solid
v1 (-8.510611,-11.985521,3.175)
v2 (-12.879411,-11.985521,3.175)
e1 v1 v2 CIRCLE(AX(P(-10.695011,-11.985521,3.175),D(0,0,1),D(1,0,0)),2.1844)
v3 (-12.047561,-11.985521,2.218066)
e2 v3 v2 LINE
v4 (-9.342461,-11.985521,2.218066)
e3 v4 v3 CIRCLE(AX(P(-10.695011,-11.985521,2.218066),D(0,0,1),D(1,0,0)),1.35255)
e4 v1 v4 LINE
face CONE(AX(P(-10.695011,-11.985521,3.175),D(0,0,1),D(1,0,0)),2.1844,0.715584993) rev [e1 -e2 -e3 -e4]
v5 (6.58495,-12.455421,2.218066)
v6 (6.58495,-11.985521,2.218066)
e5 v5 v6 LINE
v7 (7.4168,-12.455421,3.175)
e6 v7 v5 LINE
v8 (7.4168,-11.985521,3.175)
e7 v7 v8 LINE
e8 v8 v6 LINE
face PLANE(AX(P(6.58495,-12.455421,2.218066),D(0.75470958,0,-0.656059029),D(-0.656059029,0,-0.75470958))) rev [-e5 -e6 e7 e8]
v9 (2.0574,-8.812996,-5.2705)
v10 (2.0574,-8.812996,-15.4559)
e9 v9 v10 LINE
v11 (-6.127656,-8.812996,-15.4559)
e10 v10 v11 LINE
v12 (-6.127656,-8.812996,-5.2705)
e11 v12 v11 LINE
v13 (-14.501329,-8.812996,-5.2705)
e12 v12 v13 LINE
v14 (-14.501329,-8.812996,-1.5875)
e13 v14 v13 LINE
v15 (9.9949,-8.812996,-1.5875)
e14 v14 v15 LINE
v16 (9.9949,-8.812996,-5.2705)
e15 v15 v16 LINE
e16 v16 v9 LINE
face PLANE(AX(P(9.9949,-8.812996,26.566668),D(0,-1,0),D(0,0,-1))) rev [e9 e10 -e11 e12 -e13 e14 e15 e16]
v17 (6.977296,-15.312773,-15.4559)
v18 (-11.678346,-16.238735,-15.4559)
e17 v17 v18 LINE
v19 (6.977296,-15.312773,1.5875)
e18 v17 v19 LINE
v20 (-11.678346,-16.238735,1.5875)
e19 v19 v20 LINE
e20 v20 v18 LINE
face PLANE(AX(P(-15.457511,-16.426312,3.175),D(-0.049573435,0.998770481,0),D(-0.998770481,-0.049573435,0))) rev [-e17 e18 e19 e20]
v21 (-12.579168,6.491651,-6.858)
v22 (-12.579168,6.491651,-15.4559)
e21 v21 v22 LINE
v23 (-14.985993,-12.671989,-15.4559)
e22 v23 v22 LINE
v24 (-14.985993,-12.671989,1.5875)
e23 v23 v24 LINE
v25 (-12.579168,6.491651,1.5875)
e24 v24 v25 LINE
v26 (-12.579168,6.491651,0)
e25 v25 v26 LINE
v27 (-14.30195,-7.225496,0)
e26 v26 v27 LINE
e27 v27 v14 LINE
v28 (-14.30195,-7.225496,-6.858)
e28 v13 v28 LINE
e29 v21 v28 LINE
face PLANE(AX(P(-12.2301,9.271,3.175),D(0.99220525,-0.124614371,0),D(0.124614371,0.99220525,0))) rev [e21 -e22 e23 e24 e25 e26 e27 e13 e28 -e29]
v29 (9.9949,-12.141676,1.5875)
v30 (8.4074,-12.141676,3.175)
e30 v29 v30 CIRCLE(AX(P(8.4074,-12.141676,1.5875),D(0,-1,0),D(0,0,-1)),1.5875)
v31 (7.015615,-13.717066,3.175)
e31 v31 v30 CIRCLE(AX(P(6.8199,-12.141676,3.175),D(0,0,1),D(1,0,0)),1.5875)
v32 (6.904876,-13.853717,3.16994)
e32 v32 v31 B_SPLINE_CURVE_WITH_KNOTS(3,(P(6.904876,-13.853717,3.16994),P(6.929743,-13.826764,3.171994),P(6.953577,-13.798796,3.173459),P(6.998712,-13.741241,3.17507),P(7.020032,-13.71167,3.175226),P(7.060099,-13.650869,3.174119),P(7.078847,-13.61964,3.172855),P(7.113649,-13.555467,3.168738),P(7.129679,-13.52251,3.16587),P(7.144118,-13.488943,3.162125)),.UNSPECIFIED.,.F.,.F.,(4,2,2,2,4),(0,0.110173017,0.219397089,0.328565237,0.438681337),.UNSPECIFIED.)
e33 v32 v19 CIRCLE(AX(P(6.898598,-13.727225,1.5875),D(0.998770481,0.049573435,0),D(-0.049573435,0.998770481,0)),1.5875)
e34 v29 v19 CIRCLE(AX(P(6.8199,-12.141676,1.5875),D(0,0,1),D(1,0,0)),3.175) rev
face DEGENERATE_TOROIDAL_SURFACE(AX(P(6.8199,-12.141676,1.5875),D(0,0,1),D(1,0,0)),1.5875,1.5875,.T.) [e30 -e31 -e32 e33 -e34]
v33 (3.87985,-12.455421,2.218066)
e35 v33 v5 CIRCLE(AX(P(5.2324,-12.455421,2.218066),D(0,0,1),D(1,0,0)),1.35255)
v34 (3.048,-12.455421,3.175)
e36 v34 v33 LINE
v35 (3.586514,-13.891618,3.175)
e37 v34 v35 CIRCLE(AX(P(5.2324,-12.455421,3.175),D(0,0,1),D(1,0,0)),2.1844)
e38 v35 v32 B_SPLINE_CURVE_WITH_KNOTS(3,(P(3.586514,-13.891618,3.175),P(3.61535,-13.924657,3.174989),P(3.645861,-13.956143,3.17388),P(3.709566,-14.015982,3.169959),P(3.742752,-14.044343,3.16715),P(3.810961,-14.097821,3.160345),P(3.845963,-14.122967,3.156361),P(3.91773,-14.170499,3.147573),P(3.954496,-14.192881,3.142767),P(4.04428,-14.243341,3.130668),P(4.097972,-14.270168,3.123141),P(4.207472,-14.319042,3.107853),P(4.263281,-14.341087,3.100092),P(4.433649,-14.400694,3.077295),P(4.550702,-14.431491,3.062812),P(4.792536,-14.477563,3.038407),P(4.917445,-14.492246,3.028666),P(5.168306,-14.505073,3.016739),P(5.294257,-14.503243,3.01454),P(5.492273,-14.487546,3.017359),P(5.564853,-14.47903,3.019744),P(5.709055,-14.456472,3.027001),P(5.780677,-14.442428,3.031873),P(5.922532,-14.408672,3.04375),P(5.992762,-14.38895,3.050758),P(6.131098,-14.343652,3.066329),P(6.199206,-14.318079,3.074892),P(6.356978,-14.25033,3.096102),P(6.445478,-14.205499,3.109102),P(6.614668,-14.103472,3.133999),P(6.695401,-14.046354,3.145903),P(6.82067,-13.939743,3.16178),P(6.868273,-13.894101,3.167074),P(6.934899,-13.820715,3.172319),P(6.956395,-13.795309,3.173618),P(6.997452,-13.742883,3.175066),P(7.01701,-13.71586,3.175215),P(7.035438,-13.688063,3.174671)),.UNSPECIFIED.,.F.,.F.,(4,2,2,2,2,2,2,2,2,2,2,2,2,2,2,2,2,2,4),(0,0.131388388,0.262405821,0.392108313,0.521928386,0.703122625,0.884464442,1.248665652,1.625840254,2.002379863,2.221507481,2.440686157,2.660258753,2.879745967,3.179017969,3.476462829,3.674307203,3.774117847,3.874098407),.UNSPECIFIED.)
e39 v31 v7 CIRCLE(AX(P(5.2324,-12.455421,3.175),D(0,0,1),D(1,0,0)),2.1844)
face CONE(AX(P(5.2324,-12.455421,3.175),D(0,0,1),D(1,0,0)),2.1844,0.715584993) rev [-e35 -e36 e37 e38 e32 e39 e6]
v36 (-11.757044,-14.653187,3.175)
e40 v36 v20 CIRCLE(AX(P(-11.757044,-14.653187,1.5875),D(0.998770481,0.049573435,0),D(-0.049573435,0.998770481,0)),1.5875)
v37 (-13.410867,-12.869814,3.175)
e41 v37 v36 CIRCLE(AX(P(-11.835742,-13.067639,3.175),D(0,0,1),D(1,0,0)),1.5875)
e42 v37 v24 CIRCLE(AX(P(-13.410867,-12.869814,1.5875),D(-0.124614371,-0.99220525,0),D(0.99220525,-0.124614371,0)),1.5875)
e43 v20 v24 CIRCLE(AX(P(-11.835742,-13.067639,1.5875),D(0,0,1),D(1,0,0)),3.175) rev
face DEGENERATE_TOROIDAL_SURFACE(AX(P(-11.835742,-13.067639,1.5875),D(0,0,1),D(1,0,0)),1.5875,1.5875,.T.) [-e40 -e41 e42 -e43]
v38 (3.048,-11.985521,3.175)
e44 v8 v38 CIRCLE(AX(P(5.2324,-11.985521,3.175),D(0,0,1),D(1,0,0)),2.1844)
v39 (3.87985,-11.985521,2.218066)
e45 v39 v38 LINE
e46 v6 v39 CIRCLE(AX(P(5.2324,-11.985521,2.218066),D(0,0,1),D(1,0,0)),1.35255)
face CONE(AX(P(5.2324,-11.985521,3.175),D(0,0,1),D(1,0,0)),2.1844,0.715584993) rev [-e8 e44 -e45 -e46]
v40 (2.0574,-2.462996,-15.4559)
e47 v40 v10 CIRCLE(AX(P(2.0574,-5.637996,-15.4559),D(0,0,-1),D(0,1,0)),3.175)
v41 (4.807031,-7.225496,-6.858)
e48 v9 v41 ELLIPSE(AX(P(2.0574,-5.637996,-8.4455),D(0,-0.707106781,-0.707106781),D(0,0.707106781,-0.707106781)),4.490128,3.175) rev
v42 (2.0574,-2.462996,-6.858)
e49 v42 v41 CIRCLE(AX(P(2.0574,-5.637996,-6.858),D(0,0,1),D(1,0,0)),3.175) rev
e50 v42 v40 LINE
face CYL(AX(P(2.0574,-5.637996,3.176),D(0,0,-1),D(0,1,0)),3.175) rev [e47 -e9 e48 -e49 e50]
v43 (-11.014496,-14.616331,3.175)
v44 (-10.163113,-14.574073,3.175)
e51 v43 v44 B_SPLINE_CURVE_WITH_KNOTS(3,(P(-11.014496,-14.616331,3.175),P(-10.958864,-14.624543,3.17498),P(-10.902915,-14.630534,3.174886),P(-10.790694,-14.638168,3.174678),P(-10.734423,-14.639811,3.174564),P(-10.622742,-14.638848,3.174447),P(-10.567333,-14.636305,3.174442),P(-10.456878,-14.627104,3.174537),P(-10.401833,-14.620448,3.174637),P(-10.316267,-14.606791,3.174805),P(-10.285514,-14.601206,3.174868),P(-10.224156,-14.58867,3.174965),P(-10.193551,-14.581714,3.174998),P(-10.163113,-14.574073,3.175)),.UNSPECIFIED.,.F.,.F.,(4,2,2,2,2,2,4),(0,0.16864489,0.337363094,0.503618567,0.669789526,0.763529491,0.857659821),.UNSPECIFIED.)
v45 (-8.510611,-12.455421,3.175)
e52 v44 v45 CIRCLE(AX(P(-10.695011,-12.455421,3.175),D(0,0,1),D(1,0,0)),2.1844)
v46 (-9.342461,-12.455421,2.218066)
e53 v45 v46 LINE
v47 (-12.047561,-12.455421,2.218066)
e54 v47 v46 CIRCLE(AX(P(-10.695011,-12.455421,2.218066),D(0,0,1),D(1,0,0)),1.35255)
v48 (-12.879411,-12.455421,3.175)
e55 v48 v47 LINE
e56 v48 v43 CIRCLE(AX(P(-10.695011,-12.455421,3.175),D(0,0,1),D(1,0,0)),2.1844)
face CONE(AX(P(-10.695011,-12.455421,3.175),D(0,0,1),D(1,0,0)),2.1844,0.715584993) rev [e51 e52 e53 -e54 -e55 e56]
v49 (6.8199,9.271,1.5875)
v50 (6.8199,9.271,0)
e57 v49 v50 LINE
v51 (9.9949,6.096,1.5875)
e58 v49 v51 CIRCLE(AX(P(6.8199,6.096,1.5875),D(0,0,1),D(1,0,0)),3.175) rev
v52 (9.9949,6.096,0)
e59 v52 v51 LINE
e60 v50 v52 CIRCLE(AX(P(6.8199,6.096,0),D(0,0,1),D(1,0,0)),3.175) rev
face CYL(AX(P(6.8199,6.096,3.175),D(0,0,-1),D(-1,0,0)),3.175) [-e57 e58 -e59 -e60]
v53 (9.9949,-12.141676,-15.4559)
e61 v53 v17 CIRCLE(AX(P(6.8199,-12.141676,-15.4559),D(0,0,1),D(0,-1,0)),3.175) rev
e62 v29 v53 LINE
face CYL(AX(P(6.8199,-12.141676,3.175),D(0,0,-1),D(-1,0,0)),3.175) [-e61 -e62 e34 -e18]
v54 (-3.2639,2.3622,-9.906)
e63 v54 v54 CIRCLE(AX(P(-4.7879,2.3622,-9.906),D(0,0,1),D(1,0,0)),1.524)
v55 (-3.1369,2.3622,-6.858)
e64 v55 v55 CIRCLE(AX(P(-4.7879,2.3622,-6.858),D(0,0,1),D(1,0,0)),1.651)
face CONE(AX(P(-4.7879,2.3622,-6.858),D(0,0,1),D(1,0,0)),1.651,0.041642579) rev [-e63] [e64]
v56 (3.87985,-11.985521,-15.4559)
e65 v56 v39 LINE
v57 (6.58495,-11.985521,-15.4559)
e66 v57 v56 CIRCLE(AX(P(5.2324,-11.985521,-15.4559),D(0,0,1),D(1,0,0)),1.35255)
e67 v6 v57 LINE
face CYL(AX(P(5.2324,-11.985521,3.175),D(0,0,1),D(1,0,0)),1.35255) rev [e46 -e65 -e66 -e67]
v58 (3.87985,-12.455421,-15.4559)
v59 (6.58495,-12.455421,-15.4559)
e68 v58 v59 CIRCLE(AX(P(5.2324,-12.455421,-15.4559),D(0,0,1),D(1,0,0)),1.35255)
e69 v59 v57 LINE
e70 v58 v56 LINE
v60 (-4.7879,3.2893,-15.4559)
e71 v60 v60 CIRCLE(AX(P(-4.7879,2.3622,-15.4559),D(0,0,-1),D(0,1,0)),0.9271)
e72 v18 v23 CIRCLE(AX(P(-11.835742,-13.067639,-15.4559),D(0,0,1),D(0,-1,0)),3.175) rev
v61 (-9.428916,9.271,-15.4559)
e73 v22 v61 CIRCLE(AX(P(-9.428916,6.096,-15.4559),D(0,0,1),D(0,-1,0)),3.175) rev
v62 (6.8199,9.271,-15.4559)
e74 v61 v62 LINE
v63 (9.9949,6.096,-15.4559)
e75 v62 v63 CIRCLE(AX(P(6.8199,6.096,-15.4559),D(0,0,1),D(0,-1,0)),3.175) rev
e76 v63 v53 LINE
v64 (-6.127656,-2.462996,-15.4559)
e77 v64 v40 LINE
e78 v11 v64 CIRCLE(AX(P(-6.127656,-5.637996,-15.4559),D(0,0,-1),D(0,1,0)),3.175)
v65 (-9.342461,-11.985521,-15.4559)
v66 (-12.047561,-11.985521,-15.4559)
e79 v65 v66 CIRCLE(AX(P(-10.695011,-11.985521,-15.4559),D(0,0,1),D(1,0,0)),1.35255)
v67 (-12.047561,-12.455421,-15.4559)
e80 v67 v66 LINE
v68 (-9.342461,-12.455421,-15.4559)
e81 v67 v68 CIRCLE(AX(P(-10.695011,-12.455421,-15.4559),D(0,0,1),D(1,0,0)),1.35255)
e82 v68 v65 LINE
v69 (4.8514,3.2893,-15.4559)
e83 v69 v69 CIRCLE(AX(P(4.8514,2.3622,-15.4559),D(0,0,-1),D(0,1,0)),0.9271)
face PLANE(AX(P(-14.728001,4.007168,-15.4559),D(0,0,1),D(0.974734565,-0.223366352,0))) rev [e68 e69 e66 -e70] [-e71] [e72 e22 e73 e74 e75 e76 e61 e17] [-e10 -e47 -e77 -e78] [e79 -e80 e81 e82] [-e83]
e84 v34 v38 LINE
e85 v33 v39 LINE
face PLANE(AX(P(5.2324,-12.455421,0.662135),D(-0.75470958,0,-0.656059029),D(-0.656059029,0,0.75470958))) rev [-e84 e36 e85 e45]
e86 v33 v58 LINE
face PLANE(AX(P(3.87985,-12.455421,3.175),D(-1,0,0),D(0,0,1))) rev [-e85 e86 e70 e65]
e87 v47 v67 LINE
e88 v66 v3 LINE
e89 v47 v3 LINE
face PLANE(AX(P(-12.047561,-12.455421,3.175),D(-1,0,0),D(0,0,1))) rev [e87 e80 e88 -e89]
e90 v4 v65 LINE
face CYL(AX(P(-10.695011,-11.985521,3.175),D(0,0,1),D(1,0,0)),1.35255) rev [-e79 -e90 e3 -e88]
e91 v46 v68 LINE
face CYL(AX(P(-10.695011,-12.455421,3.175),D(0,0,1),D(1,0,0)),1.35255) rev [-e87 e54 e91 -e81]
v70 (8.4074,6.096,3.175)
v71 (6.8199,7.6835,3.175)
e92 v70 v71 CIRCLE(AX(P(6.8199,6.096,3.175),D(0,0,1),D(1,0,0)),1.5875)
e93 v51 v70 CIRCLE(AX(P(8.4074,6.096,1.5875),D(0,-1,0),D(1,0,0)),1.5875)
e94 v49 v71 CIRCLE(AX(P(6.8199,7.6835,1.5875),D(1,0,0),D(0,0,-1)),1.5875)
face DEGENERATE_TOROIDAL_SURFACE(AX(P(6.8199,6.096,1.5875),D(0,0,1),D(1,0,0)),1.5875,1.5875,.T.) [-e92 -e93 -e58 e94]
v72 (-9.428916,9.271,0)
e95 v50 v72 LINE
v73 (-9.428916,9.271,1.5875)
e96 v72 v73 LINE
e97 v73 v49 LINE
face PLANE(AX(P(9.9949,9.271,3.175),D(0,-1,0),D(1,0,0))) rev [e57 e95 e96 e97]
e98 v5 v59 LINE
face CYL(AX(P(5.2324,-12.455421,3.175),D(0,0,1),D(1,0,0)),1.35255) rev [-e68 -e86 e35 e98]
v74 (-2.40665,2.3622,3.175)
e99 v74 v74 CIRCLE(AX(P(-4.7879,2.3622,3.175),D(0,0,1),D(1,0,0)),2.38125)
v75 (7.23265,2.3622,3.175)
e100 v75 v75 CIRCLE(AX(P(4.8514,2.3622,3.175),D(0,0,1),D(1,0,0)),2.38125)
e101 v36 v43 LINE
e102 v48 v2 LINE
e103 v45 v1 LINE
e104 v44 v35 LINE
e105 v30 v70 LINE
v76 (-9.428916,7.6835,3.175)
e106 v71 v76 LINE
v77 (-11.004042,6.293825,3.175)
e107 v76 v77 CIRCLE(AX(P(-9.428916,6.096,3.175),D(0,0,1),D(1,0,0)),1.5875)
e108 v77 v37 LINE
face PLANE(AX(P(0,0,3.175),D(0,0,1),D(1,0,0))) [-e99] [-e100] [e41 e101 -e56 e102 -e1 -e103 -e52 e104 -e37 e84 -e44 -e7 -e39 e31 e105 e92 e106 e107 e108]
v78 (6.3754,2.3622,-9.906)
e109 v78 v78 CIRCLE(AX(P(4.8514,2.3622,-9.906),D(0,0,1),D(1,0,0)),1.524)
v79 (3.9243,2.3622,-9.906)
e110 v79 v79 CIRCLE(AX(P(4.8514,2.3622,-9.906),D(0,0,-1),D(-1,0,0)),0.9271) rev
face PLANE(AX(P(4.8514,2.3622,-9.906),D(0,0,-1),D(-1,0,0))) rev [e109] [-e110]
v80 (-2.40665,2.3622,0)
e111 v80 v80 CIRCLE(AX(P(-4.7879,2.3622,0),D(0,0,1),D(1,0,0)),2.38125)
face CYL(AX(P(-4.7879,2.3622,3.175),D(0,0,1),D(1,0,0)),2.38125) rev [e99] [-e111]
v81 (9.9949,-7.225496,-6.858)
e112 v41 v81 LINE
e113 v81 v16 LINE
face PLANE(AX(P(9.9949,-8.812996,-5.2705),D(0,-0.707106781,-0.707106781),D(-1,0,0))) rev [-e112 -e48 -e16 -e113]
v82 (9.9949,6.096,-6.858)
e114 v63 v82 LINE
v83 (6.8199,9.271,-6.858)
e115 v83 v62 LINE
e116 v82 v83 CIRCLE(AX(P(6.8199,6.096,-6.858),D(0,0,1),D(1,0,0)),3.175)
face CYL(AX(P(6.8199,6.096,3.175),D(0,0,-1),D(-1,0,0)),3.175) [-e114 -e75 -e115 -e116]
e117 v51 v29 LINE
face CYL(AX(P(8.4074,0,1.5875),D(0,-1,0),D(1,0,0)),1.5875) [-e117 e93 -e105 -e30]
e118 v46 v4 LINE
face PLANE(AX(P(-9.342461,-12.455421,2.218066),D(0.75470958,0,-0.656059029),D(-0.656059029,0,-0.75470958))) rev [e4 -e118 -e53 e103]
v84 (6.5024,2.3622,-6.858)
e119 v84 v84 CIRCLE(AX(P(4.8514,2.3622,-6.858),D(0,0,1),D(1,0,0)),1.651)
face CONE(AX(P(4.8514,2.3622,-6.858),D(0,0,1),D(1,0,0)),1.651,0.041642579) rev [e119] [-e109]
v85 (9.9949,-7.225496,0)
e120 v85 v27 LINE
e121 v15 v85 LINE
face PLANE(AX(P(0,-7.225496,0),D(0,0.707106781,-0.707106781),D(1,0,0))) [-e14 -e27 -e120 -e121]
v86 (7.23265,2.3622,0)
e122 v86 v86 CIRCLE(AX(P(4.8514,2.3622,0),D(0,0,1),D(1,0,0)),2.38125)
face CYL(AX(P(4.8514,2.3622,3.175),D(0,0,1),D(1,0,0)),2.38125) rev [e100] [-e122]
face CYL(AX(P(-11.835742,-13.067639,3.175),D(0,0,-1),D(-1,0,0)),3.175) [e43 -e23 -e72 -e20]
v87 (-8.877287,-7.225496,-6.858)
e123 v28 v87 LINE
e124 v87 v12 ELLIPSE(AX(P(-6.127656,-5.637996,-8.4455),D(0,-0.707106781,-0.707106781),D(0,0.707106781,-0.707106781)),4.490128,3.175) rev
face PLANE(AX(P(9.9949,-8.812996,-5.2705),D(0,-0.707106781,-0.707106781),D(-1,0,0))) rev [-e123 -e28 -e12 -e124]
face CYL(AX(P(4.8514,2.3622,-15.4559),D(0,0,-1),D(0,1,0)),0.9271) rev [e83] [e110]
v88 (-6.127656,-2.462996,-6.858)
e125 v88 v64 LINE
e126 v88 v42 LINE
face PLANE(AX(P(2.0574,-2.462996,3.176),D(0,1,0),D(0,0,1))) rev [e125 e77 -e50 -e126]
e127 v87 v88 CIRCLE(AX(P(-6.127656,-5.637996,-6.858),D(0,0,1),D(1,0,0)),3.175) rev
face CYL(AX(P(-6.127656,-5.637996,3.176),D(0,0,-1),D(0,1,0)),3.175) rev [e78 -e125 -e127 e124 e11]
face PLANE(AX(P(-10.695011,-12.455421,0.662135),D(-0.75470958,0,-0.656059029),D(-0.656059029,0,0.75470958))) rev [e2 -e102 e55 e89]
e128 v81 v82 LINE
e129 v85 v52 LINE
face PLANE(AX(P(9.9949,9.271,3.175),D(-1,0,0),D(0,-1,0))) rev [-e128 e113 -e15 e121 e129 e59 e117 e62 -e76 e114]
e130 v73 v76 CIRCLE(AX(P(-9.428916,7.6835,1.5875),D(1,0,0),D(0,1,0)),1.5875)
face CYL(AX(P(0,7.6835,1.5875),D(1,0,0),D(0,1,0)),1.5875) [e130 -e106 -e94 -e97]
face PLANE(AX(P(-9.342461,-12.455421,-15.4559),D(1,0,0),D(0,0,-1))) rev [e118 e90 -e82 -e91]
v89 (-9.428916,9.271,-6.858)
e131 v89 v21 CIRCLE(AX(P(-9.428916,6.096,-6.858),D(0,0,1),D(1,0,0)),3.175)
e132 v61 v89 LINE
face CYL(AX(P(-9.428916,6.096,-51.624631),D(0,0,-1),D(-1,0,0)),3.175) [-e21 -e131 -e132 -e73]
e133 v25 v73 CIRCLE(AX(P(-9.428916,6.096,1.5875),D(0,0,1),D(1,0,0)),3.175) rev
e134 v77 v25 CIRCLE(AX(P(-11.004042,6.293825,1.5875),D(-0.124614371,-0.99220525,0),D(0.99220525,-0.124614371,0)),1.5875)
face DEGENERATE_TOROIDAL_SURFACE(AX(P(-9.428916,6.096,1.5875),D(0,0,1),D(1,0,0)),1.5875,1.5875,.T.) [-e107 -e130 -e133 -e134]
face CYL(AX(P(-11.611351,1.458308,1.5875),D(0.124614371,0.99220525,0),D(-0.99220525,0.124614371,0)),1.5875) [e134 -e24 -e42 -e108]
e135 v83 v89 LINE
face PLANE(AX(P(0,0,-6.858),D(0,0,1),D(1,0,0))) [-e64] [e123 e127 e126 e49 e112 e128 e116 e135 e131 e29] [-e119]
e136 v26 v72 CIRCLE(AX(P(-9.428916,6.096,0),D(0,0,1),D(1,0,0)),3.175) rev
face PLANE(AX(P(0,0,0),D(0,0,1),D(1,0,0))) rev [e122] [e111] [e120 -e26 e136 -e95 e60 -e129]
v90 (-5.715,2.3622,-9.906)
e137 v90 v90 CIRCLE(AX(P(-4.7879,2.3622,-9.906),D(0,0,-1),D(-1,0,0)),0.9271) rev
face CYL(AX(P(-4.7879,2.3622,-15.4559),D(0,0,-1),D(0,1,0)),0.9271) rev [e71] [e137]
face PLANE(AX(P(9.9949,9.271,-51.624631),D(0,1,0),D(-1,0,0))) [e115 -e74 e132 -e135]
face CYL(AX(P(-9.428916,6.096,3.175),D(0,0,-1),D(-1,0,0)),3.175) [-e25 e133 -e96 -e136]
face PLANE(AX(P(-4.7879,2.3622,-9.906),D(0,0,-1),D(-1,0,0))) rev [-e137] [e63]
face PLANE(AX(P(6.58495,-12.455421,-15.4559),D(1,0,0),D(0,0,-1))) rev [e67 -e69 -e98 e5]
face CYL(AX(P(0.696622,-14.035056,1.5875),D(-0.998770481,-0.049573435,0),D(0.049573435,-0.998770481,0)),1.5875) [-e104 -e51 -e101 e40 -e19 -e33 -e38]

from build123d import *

# Parameters (mm, degrees)
BOSS_EXTRUDE1_DEPTH                           = 3.175
BOSS_EXTRUDE2_START                           = -6.858
BOSS_EXTRUDE2_DEPTH                           = 8.5979
BOSS_EXTRUDE3_DEPTH                           = 6.858
CSK_START                                     = -16
CSK_SLOT_FOR_2_FLAT_HEAD_MACHINE_SCREW1_DEPTH = 20
FILLET1_R                                     = 3.175
CHAMFER1_SIZE                                 = 1.5875
F_3_16_0_1875_DIAMETER_HOLE1_D                = 4.7625
F_3_16_0_1875_DIAMETER_HOLE1_DEPTH            = 3.175
F_0_CLEARANCE_HOLE1_D                         = 1.8542
HOLE1_AT_2_COUNT                              = 2
HOLE1_AT_2_PITCH                              = 9.6393
CUT_EXTRUDE2_REACH                            = 30.918
FILLET3_R                                     = 1.5875


with BuildPart() as part:
    # Sketch1 → Boss-Extrude1 (new body)
    with BuildSketch(Plane.XY):
        Polygon((9.9949, 9.271), (9.9949, -15.162995595), (-15.457511269, -16.426312325), (-12.2301, 9.271), align=None)
    extrude(amount=BOSS_EXTRUDE1_DEPTH)



with BuildPart() as body_2:
    # Sketch1<2> → Boss-Extrude2 (new body)
    with BuildSketch(Plane.XY.offset(BOSS_EXTRUDE2_START)):
        Polygon((9.9949, 9.271), (9.9949, -15.162995595), (-15.457511269, -16.426312325), (-12.2301, 9.271), align=None)
    extrude(amount=-BOSS_EXTRUDE2_DEPTH)


with BuildPart() as part_1:
    add(part.part)

    add(body_2.part)  # Boss-Extrude3 merges body 2
    # Sketch3 → Boss-Extrude3 (add)
    with BuildSketch(Plane.XY.offset(-6.858)):
        Polygon((9.9949, -8.812995595), (9.9949, -15.162995595), (-15.457511269, -16.426312325), (-14.501329397, -8.812995595), align=None)
    extrude(amount=BOSS_EXTRUDE3_DEPTH)

    # CSK SLOT for #2 Flat Head Machine Screw1: read off the stored shape, not the designer's step
    # CSK SLOT for _2 Flat Head Machine Sc 2 → CSK SLOT for #2 Flat Head Machine Screw1 (cut)
    with BuildSketch(Plane.XY.offset(CSK_START)):
        with BuildLine():
            Line((-9.342461269, -12.455421191), (-9.342461269, -11.985521191))
            ThreePointArc((-9.342461269, -11.985521191), (-10.695011269, -10.632971191), (-12.047561269, -11.985521191))
            Line((-12.047561269, -11.985521191), (-12.047561269, -12.455421191))
            ThreePointArc((-12.047561269, -12.455421191), (-10.695011269, -13.807971191), (-9.342461269, -12.455421191))
        make_face()
        with BuildLine():
            Line((6.58495, -12.455421191), (6.58495, -11.985521191))
            ThreePointArc((6.58495, -11.985521191), (5.2324, -10.632971191), (3.87985, -11.985521191))
            Line((3.87985, -11.985521191), (3.87985, -12.455421191))
            ThreePointArc((3.87985, -12.455421191), (5.2324, -13.807971191), (6.58495, -12.455421191))
        make_face()
    extrude(amount=CSK_SLOT_FOR_2_FLAT_HEAD_MACHINE_SCREW1_DEPTH, mode=Mode.SUBTRACT)

    # CSK SLOT for _2 Flat Head Machine Sc 3: loft between two sections, ruled curve by curve
    csk_slot_for_2_flat_head_machine_sc_3_from = [
        Edge.make_three_point_arc((-9.342461269, -11.985521191, 2.21806604), (-9.738613992, -11.029123914, 2.21806604), (-10.695011269, -10.632971191, 2.21806604)),
        Edge.make_three_point_arc((-10.695011269, -10.632971191, 2.21806604), (-11.651408546, -11.029123914, 2.21806604), (-12.047561269, -11.985521191, 2.21806604)),
        Edge.make_three_point_arc((-12.047561269, -12.455421191, 2.21806604), (-11.651408546, -13.411818468, 2.21806604), (-10.695011269, -13.807971191, 2.21806604)),
        Edge.make_three_point_arc((-10.695011269, -13.807971191, 2.21806604), (-9.738613992, -13.411818468, 2.21806604), (-9.342461269, -12.455421191, 2.21806604)),
        Edge.make_line((-12.047561269, -11.985521191, 2.21806604), (-12.047561269, -12.455421191, 2.21806604)),
        Edge.make_line((-9.342461269, -11.985521191, 2.21806604), (-9.342461269, -12.455421191, 2.21806604)),
    ]
    csk_slot_for_2_flat_head_machine_sc_3_to = [
        Edge.make_three_point_arc((-8.510611269, -11.985521191, 3.175), (-9.150407216, -10.440917138, 3.175), (-10.695011269, -9.801121191, 3.175)),
        Edge.make_three_point_arc((-10.695011269, -9.801121191, 3.175), (-12.239615322, -10.440917138, 3.175), (-12.879411269, -11.985521191, 3.175)),
        Edge.make_three_point_arc((-12.879411269, -12.455421191, 3.175), (-12.239615322, -14.000025244, 3.175), (-10.695011269, -14.639821191, 3.175)),
        Edge.make_three_point_arc((-10.695011269, -14.639821191, 3.175), (-9.150407216, -14.000025244, 3.175), (-8.510611269, -12.455421191, 3.175)),
        Edge.make_line((-12.879411269, -11.985521191, 3.175), (-12.879411269, -12.455421191, 3.175)),
        Edge.make_line((-8.510611269, -11.985521191, 3.175), (-8.510611269, -12.455421191, 3.175)),
    ]
    csk_slot_for_2_flat_head_machine_sc_3 = Solid(Shell([*[Face.make_surface_from_curves(csk_slot_for_2_flat_head_machine_sc_3_from[k], csk_slot_for_2_flat_head_machine_sc_3_to[k]) for k in range(6)], Face(Wire(csk_slot_for_2_flat_head_machine_sc_3_from)), Face(Wire(csk_slot_for_2_flat_head_machine_sc_3_to))]))
    add(csk_slot_for_2_flat_head_machine_sc_3, mode=Mode.SUBTRACT)

    # CSK SLOT for _2 Flat Head Machine Sc 4: loft between two sections, ruled curve by curve
    csk_slot_for_2_flat_head_machine_sc_4_from = [
        Edge.make_three_point_arc((6.58495, -11.985521191, 2.21806604), (6.188797277, -11.029123914, 2.21806604), (5.2324, -10.632971191, 2.21806604)),
        Edge.make_three_point_arc((5.2324, -10.632971191, 2.21806604), (4.276002723, -11.029123914, 2.21806604), (3.87985, -11.985521191, 2.21806604)),
        Edge.make_three_point_arc((3.87985, -12.455421191, 2.21806604), (4.276002723, -13.411818468, 2.21806604), (5.2324, -13.807971191, 2.21806604)),
        Edge.make_three_point_arc((5.2324, -13.807971191, 2.21806604), (6.188797277, -13.411818468, 2.21806604), (6.58495, -12.455421191, 2.21806604)),
        Edge.make_line((3.87985, -11.985521191, 2.21806604), (3.87985, -12.455421191, 2.21806604)),
        Edge.make_line((6.58495, -11.985521191, 2.21806604), (6.58495, -12.455421191, 2.21806604)),
    ]
    csk_slot_for_2_flat_head_machine_sc_4_to = [
        Edge.make_three_point_arc((7.4168, -11.985521191, 3.175), (6.777004053, -10.440917138, 3.175), (5.2324, -9.801121191, 3.175)),
        Edge.make_three_point_arc((5.2324, -9.801121191, 3.175), (3.687795947, -10.440917138, 3.175), (3.048, -11.985521191, 3.175)),
        Edge.make_three_point_arc((3.048, -12.455421191, 3.175), (3.687795947, -14.000025244, 3.175), (5.2324, -14.639821191, 3.175)),
        Edge.make_three_point_arc((5.2324, -14.639821191, 3.175), (6.777004053, -14.000025244, 3.175), (7.4168, -12.455421191, 3.175)),
        Edge.make_line((3.048, -11.985521191, 3.175), (3.048, -12.455421191, 3.175)),
        Edge.make_line((7.4168, -11.985521191, 3.175), (7.4168, -12.455421191, 3.175)),
    ]
    csk_slot_for_2_flat_head_machine_sc_4 = Solid(Shell([*[Face.make_surface_from_curves(csk_slot_for_2_flat_head_machine_sc_4_from[k], csk_slot_for_2_flat_head_machine_sc_4_to[k]) for k in range(6)], Face(Wire(csk_slot_for_2_flat_head_machine_sc_4_from)), Face(Wire(csk_slot_for_2_flat_head_machine_sc_4_to))]))
    add(csk_slot_for_2_flat_head_machine_sc_4, mode=Mode.SUBTRACT)

    # Fillet1
    fillet1_edges = [part_1.edges().sort_by_distance(p)[0] for p in [
        (-12.2301, 9.271, -11.15695),
        (9.9949, 9.271, -11.15695),
        (9.9949, 9.271, 1.5875),
        (9.9949, -15.162995595, -6.14045),
        (-15.457511269, -16.426312325, -6.14045),
        (-12.2301, 9.271, 1.5875),
    ]]
    fillet(fillet1_edges, radius=FILLET1_R)

    # Chamfer1
    chamfer1_edges = [part_1.edges().sort_by_distance(p)[0] for p in [
        (-2.253214698, -8.812995595, -6.858),
        (-2.253214698, -8.812995595, 0),
    ]]
    chamfer(chamfer1_edges, length=CHAMFER1_SIZE)

    # 3/16 (0.1875) Diameter Hole1
    with Locations(Plane.XY.offset(3.175)):
        with Locations((4.8514, 2.3622), (-4.7879, 2.3622)):
            Hole(F_3_16_0_1875_DIAMETER_HOLE1_D / 2, depth=F_3_16_0_1875_DIAMETER_HOLE1_DEPTH)

    # #0 Clearance Hole1 (through all)
    with Locations(Plane(origin=(0, 0, -15.4559), x_dir=(-1, 0, 0), z_dir=(0, 0, -1))):
        with Locations((-4.8514, 2.3622), (4.7879, 2.3622)):
            Hole(F_0_CLEARANCE_HOLE1_D / 2)

    # Sketch11 → Hole1 (revolve, cut)
    with BuildSketch(Plane(origin=(4.8514, 2.3622, -6.858), x_dir=(0, -1, 0), z_dir=(1, 0, 0))):
        Polygon((0, 0), (0, 3.048), (1.524, 3.048), (1.651, 0), align=None)
    hole1 = revolve(axis=Axis((4.8514, 2.3622, -116.858), (0, 0, 1)), mode=Mode.SUBTRACT)

    # Hole1 at 2: Hole1 ×2
    with Locations(*[(-i * HOLE1_AT_2_PITCH, 0, 0) for i in range(1, HOLE1_AT_2_COUNT)]):
        add(hole1, mode=Mode.SUBTRACT)

    # Sketch13 → Cut-Extrude2 (cut, up to next)
    with BuildSketch(Plane(origin=(0, 0, -15.4559), x_dir=(-1, 0, 0), z_dir=(0, 0, -1)), mode=Mode.PRIVATE) as cut_extrude2_sk1:
        with BuildLine():
            Line((-2.0574, -2.462995595), (6.127656415, -2.462995595))
            ThreePointArc((6.127656415, -2.462995595), (9.302656415, -5.637995595), (6.127656415, -8.812995595))
            Line((6.127656415, -8.812995595), (-2.0574, -8.812995595))
            ThreePointArc((-2.0574, -8.812995595), (-5.2324, -5.637995595), (-2.0574, -2.462995595))
        make_face()
    cut_extrude2_tool1 = extrude(cut_extrude2_sk1.sketch, amount=-CUT_EXTRUDE2_REACH, mode=Mode.PRIVATE) & part_1.part
    add(cut_extrude2_tool1.solids().sort_by_distance((-2.035128, -5.637996, -15.4559))[0], mode=Mode.SUBTRACT)

    # Fillet3
    # the kernel refuses this fillet: 1.5875 mm, written as the material it takes off along each edge
    with BuildSketch(Plane(origin=(-14.985993213, -12.67198858, 3.175), x_dir=(0.9922052502363689, -0.12461437077393937, 0), z_dir=(0.12461437077393936, 0.9922052502363689, 0))) as fillet3_piece_1:
        with BuildLine():
            CenterArc((FILLET3_R, FILLET3_R), FILLET3_R, 180, 90)
            Line((0, FILLET3_R), (0, 0))
            Line((0, 0), (FILLET3_R, 0))
        make_face()
    extrude(amount=19.314188473, mode=Mode.SUBTRACT)
    with BuildSketch(Plane(origin=(-9.4289161, 9.271, 3.175), x_dir=(0, -1, 0), z_dir=(1, 0, 0))) as fillet3_piece_2:
        with BuildLine():
            CenterArc((FILLET3_R, FILLET3_R), FILLET3_R, 180, 90)
            Line((0, FILLET3_R), (0, 0))
            Line((0, 0), (FILLET3_R, 0))
        make_face()
    extrude(amount=16.2488161, mode=Mode.SUBTRACT)
    with BuildSketch(Plane(origin=(6.977295656, -15.312772762, 3.175), x_dir=(-0.04957343510019617, 0.9987704814081995, 0), z_dir=(-0.9987704814081996, -0.049573435100196184, 0))) as fillet3_piece_3:
        with BuildLine():
            CenterArc((FILLET3_R, FILLET3_R), FILLET3_R, 180, 90)
            Line((0, FILLET3_R), (0, 0))
            Line((0, 0), (FILLET3_R, 0))
        make_face()
    extrude(amount=18.678607238, mode=Mode.SUBTRACT)
    with BuildSketch(Plane(origin=(9.9949, 6.096, 3.175), x_dir=(0, 0, -1), z_dir=(0, -1, 0))) as fillet3_piece_4:
        with BuildLine():
            CenterArc((FILLET3_R, -FILLET3_R), FILLET3_R, 90, 90)
            Line((0, -FILLET3_R), (0, 0))
            Line((0, 0), (FILLET3_R, 0))
        make_face()
    extrude(amount=18.237676483, mode=Mode.SUBTRACT)
    with BuildSketch(Plane(origin=(-11.835741543, -13.067639207, 3.175), x_dir=(0.04957343510019569, -0.9987704814081997, 0), z_dir=(0.9987704814081997, 0.04957343510019569, 0))) as fillet3_piece_5:
        with BuildLine():
            CenterArc((3.175 - FILLET3_R, FILLET3_R), FILLET3_R, 270, 90)
            Line((3.175, FILLET3_R), (3.175, 0))
            Line((3.175, 0), (3.175 - FILLET3_R, 0))
        make_face()
    revolve(axis=Axis((-11.835741543, -13.067639207, 3.175), (0, 0, -1)), revolution_arc=100, mode=Mode.SUBTRACT)
    with BuildSketch(Plane(origin=(6.8199, -12.141676483, 3.175), x_dir=(1, 0, 0), z_dir=(0, 1, 0))) as fillet3_piece_6:
        with BuildLine():
            CenterArc((3.175 - FILLET3_R, FILLET3_R), FILLET3_R, 270, 90)
            Line((3.175, FILLET3_R), (3.175, 0))
            Line((3.175, 0), (3.175 - FILLET3_R, 0))
        make_face()
    revolve(axis=Axis((6.8199, -12.141676483, 3.175), (0, 0, -1)), revolution_arc=87.158486733, mode=Mode.SUBTRACT)
    with BuildSketch(Plane(origin=(6.8199, 6.096, 3.175), x_dir=(1, 0, 0), z_dir=(0, -1, 0))) as fillet3_piece_7:
        with BuildLine():
            CenterArc((3.175 - FILLET3_R, -FILLET3_R), FILLET3_R, 0, 90)
            Line((3.175 - FILLET3_R, 0), (3.175, 0))
            Line((3.175, 0), (3.175, -FILLET3_R))
        make_face()
    revolve(axis=Axis((6.8199, 6.096, 3.175), (0, 0, 1)), revolution_arc=90, mode=Mode.SUBTRACT)
    with BuildSketch(Plane(origin=(-9.4289161, 6.096, 3.175), x_dir=(0, 1, 0), z_dir=(1, 0, 0))) as fillet3_piece_8:
        with BuildLine():
            CenterArc((3.175 - FILLET3_R, -FILLET3_R), FILLET3_R, 0, 90)
            Line((3.175, -FILLET3_R), (3.175, 0))
            Line((3.175, 0), (3.175 - FILLET3_R, 0))
        make_face()
    revolve(axis=Axis((-9.4289161, 6.096, 3.175), (0, 0, 1)), revolution_arc=82.841513267, mode=Mode.SUBTRACT)


solid = part_1.part
